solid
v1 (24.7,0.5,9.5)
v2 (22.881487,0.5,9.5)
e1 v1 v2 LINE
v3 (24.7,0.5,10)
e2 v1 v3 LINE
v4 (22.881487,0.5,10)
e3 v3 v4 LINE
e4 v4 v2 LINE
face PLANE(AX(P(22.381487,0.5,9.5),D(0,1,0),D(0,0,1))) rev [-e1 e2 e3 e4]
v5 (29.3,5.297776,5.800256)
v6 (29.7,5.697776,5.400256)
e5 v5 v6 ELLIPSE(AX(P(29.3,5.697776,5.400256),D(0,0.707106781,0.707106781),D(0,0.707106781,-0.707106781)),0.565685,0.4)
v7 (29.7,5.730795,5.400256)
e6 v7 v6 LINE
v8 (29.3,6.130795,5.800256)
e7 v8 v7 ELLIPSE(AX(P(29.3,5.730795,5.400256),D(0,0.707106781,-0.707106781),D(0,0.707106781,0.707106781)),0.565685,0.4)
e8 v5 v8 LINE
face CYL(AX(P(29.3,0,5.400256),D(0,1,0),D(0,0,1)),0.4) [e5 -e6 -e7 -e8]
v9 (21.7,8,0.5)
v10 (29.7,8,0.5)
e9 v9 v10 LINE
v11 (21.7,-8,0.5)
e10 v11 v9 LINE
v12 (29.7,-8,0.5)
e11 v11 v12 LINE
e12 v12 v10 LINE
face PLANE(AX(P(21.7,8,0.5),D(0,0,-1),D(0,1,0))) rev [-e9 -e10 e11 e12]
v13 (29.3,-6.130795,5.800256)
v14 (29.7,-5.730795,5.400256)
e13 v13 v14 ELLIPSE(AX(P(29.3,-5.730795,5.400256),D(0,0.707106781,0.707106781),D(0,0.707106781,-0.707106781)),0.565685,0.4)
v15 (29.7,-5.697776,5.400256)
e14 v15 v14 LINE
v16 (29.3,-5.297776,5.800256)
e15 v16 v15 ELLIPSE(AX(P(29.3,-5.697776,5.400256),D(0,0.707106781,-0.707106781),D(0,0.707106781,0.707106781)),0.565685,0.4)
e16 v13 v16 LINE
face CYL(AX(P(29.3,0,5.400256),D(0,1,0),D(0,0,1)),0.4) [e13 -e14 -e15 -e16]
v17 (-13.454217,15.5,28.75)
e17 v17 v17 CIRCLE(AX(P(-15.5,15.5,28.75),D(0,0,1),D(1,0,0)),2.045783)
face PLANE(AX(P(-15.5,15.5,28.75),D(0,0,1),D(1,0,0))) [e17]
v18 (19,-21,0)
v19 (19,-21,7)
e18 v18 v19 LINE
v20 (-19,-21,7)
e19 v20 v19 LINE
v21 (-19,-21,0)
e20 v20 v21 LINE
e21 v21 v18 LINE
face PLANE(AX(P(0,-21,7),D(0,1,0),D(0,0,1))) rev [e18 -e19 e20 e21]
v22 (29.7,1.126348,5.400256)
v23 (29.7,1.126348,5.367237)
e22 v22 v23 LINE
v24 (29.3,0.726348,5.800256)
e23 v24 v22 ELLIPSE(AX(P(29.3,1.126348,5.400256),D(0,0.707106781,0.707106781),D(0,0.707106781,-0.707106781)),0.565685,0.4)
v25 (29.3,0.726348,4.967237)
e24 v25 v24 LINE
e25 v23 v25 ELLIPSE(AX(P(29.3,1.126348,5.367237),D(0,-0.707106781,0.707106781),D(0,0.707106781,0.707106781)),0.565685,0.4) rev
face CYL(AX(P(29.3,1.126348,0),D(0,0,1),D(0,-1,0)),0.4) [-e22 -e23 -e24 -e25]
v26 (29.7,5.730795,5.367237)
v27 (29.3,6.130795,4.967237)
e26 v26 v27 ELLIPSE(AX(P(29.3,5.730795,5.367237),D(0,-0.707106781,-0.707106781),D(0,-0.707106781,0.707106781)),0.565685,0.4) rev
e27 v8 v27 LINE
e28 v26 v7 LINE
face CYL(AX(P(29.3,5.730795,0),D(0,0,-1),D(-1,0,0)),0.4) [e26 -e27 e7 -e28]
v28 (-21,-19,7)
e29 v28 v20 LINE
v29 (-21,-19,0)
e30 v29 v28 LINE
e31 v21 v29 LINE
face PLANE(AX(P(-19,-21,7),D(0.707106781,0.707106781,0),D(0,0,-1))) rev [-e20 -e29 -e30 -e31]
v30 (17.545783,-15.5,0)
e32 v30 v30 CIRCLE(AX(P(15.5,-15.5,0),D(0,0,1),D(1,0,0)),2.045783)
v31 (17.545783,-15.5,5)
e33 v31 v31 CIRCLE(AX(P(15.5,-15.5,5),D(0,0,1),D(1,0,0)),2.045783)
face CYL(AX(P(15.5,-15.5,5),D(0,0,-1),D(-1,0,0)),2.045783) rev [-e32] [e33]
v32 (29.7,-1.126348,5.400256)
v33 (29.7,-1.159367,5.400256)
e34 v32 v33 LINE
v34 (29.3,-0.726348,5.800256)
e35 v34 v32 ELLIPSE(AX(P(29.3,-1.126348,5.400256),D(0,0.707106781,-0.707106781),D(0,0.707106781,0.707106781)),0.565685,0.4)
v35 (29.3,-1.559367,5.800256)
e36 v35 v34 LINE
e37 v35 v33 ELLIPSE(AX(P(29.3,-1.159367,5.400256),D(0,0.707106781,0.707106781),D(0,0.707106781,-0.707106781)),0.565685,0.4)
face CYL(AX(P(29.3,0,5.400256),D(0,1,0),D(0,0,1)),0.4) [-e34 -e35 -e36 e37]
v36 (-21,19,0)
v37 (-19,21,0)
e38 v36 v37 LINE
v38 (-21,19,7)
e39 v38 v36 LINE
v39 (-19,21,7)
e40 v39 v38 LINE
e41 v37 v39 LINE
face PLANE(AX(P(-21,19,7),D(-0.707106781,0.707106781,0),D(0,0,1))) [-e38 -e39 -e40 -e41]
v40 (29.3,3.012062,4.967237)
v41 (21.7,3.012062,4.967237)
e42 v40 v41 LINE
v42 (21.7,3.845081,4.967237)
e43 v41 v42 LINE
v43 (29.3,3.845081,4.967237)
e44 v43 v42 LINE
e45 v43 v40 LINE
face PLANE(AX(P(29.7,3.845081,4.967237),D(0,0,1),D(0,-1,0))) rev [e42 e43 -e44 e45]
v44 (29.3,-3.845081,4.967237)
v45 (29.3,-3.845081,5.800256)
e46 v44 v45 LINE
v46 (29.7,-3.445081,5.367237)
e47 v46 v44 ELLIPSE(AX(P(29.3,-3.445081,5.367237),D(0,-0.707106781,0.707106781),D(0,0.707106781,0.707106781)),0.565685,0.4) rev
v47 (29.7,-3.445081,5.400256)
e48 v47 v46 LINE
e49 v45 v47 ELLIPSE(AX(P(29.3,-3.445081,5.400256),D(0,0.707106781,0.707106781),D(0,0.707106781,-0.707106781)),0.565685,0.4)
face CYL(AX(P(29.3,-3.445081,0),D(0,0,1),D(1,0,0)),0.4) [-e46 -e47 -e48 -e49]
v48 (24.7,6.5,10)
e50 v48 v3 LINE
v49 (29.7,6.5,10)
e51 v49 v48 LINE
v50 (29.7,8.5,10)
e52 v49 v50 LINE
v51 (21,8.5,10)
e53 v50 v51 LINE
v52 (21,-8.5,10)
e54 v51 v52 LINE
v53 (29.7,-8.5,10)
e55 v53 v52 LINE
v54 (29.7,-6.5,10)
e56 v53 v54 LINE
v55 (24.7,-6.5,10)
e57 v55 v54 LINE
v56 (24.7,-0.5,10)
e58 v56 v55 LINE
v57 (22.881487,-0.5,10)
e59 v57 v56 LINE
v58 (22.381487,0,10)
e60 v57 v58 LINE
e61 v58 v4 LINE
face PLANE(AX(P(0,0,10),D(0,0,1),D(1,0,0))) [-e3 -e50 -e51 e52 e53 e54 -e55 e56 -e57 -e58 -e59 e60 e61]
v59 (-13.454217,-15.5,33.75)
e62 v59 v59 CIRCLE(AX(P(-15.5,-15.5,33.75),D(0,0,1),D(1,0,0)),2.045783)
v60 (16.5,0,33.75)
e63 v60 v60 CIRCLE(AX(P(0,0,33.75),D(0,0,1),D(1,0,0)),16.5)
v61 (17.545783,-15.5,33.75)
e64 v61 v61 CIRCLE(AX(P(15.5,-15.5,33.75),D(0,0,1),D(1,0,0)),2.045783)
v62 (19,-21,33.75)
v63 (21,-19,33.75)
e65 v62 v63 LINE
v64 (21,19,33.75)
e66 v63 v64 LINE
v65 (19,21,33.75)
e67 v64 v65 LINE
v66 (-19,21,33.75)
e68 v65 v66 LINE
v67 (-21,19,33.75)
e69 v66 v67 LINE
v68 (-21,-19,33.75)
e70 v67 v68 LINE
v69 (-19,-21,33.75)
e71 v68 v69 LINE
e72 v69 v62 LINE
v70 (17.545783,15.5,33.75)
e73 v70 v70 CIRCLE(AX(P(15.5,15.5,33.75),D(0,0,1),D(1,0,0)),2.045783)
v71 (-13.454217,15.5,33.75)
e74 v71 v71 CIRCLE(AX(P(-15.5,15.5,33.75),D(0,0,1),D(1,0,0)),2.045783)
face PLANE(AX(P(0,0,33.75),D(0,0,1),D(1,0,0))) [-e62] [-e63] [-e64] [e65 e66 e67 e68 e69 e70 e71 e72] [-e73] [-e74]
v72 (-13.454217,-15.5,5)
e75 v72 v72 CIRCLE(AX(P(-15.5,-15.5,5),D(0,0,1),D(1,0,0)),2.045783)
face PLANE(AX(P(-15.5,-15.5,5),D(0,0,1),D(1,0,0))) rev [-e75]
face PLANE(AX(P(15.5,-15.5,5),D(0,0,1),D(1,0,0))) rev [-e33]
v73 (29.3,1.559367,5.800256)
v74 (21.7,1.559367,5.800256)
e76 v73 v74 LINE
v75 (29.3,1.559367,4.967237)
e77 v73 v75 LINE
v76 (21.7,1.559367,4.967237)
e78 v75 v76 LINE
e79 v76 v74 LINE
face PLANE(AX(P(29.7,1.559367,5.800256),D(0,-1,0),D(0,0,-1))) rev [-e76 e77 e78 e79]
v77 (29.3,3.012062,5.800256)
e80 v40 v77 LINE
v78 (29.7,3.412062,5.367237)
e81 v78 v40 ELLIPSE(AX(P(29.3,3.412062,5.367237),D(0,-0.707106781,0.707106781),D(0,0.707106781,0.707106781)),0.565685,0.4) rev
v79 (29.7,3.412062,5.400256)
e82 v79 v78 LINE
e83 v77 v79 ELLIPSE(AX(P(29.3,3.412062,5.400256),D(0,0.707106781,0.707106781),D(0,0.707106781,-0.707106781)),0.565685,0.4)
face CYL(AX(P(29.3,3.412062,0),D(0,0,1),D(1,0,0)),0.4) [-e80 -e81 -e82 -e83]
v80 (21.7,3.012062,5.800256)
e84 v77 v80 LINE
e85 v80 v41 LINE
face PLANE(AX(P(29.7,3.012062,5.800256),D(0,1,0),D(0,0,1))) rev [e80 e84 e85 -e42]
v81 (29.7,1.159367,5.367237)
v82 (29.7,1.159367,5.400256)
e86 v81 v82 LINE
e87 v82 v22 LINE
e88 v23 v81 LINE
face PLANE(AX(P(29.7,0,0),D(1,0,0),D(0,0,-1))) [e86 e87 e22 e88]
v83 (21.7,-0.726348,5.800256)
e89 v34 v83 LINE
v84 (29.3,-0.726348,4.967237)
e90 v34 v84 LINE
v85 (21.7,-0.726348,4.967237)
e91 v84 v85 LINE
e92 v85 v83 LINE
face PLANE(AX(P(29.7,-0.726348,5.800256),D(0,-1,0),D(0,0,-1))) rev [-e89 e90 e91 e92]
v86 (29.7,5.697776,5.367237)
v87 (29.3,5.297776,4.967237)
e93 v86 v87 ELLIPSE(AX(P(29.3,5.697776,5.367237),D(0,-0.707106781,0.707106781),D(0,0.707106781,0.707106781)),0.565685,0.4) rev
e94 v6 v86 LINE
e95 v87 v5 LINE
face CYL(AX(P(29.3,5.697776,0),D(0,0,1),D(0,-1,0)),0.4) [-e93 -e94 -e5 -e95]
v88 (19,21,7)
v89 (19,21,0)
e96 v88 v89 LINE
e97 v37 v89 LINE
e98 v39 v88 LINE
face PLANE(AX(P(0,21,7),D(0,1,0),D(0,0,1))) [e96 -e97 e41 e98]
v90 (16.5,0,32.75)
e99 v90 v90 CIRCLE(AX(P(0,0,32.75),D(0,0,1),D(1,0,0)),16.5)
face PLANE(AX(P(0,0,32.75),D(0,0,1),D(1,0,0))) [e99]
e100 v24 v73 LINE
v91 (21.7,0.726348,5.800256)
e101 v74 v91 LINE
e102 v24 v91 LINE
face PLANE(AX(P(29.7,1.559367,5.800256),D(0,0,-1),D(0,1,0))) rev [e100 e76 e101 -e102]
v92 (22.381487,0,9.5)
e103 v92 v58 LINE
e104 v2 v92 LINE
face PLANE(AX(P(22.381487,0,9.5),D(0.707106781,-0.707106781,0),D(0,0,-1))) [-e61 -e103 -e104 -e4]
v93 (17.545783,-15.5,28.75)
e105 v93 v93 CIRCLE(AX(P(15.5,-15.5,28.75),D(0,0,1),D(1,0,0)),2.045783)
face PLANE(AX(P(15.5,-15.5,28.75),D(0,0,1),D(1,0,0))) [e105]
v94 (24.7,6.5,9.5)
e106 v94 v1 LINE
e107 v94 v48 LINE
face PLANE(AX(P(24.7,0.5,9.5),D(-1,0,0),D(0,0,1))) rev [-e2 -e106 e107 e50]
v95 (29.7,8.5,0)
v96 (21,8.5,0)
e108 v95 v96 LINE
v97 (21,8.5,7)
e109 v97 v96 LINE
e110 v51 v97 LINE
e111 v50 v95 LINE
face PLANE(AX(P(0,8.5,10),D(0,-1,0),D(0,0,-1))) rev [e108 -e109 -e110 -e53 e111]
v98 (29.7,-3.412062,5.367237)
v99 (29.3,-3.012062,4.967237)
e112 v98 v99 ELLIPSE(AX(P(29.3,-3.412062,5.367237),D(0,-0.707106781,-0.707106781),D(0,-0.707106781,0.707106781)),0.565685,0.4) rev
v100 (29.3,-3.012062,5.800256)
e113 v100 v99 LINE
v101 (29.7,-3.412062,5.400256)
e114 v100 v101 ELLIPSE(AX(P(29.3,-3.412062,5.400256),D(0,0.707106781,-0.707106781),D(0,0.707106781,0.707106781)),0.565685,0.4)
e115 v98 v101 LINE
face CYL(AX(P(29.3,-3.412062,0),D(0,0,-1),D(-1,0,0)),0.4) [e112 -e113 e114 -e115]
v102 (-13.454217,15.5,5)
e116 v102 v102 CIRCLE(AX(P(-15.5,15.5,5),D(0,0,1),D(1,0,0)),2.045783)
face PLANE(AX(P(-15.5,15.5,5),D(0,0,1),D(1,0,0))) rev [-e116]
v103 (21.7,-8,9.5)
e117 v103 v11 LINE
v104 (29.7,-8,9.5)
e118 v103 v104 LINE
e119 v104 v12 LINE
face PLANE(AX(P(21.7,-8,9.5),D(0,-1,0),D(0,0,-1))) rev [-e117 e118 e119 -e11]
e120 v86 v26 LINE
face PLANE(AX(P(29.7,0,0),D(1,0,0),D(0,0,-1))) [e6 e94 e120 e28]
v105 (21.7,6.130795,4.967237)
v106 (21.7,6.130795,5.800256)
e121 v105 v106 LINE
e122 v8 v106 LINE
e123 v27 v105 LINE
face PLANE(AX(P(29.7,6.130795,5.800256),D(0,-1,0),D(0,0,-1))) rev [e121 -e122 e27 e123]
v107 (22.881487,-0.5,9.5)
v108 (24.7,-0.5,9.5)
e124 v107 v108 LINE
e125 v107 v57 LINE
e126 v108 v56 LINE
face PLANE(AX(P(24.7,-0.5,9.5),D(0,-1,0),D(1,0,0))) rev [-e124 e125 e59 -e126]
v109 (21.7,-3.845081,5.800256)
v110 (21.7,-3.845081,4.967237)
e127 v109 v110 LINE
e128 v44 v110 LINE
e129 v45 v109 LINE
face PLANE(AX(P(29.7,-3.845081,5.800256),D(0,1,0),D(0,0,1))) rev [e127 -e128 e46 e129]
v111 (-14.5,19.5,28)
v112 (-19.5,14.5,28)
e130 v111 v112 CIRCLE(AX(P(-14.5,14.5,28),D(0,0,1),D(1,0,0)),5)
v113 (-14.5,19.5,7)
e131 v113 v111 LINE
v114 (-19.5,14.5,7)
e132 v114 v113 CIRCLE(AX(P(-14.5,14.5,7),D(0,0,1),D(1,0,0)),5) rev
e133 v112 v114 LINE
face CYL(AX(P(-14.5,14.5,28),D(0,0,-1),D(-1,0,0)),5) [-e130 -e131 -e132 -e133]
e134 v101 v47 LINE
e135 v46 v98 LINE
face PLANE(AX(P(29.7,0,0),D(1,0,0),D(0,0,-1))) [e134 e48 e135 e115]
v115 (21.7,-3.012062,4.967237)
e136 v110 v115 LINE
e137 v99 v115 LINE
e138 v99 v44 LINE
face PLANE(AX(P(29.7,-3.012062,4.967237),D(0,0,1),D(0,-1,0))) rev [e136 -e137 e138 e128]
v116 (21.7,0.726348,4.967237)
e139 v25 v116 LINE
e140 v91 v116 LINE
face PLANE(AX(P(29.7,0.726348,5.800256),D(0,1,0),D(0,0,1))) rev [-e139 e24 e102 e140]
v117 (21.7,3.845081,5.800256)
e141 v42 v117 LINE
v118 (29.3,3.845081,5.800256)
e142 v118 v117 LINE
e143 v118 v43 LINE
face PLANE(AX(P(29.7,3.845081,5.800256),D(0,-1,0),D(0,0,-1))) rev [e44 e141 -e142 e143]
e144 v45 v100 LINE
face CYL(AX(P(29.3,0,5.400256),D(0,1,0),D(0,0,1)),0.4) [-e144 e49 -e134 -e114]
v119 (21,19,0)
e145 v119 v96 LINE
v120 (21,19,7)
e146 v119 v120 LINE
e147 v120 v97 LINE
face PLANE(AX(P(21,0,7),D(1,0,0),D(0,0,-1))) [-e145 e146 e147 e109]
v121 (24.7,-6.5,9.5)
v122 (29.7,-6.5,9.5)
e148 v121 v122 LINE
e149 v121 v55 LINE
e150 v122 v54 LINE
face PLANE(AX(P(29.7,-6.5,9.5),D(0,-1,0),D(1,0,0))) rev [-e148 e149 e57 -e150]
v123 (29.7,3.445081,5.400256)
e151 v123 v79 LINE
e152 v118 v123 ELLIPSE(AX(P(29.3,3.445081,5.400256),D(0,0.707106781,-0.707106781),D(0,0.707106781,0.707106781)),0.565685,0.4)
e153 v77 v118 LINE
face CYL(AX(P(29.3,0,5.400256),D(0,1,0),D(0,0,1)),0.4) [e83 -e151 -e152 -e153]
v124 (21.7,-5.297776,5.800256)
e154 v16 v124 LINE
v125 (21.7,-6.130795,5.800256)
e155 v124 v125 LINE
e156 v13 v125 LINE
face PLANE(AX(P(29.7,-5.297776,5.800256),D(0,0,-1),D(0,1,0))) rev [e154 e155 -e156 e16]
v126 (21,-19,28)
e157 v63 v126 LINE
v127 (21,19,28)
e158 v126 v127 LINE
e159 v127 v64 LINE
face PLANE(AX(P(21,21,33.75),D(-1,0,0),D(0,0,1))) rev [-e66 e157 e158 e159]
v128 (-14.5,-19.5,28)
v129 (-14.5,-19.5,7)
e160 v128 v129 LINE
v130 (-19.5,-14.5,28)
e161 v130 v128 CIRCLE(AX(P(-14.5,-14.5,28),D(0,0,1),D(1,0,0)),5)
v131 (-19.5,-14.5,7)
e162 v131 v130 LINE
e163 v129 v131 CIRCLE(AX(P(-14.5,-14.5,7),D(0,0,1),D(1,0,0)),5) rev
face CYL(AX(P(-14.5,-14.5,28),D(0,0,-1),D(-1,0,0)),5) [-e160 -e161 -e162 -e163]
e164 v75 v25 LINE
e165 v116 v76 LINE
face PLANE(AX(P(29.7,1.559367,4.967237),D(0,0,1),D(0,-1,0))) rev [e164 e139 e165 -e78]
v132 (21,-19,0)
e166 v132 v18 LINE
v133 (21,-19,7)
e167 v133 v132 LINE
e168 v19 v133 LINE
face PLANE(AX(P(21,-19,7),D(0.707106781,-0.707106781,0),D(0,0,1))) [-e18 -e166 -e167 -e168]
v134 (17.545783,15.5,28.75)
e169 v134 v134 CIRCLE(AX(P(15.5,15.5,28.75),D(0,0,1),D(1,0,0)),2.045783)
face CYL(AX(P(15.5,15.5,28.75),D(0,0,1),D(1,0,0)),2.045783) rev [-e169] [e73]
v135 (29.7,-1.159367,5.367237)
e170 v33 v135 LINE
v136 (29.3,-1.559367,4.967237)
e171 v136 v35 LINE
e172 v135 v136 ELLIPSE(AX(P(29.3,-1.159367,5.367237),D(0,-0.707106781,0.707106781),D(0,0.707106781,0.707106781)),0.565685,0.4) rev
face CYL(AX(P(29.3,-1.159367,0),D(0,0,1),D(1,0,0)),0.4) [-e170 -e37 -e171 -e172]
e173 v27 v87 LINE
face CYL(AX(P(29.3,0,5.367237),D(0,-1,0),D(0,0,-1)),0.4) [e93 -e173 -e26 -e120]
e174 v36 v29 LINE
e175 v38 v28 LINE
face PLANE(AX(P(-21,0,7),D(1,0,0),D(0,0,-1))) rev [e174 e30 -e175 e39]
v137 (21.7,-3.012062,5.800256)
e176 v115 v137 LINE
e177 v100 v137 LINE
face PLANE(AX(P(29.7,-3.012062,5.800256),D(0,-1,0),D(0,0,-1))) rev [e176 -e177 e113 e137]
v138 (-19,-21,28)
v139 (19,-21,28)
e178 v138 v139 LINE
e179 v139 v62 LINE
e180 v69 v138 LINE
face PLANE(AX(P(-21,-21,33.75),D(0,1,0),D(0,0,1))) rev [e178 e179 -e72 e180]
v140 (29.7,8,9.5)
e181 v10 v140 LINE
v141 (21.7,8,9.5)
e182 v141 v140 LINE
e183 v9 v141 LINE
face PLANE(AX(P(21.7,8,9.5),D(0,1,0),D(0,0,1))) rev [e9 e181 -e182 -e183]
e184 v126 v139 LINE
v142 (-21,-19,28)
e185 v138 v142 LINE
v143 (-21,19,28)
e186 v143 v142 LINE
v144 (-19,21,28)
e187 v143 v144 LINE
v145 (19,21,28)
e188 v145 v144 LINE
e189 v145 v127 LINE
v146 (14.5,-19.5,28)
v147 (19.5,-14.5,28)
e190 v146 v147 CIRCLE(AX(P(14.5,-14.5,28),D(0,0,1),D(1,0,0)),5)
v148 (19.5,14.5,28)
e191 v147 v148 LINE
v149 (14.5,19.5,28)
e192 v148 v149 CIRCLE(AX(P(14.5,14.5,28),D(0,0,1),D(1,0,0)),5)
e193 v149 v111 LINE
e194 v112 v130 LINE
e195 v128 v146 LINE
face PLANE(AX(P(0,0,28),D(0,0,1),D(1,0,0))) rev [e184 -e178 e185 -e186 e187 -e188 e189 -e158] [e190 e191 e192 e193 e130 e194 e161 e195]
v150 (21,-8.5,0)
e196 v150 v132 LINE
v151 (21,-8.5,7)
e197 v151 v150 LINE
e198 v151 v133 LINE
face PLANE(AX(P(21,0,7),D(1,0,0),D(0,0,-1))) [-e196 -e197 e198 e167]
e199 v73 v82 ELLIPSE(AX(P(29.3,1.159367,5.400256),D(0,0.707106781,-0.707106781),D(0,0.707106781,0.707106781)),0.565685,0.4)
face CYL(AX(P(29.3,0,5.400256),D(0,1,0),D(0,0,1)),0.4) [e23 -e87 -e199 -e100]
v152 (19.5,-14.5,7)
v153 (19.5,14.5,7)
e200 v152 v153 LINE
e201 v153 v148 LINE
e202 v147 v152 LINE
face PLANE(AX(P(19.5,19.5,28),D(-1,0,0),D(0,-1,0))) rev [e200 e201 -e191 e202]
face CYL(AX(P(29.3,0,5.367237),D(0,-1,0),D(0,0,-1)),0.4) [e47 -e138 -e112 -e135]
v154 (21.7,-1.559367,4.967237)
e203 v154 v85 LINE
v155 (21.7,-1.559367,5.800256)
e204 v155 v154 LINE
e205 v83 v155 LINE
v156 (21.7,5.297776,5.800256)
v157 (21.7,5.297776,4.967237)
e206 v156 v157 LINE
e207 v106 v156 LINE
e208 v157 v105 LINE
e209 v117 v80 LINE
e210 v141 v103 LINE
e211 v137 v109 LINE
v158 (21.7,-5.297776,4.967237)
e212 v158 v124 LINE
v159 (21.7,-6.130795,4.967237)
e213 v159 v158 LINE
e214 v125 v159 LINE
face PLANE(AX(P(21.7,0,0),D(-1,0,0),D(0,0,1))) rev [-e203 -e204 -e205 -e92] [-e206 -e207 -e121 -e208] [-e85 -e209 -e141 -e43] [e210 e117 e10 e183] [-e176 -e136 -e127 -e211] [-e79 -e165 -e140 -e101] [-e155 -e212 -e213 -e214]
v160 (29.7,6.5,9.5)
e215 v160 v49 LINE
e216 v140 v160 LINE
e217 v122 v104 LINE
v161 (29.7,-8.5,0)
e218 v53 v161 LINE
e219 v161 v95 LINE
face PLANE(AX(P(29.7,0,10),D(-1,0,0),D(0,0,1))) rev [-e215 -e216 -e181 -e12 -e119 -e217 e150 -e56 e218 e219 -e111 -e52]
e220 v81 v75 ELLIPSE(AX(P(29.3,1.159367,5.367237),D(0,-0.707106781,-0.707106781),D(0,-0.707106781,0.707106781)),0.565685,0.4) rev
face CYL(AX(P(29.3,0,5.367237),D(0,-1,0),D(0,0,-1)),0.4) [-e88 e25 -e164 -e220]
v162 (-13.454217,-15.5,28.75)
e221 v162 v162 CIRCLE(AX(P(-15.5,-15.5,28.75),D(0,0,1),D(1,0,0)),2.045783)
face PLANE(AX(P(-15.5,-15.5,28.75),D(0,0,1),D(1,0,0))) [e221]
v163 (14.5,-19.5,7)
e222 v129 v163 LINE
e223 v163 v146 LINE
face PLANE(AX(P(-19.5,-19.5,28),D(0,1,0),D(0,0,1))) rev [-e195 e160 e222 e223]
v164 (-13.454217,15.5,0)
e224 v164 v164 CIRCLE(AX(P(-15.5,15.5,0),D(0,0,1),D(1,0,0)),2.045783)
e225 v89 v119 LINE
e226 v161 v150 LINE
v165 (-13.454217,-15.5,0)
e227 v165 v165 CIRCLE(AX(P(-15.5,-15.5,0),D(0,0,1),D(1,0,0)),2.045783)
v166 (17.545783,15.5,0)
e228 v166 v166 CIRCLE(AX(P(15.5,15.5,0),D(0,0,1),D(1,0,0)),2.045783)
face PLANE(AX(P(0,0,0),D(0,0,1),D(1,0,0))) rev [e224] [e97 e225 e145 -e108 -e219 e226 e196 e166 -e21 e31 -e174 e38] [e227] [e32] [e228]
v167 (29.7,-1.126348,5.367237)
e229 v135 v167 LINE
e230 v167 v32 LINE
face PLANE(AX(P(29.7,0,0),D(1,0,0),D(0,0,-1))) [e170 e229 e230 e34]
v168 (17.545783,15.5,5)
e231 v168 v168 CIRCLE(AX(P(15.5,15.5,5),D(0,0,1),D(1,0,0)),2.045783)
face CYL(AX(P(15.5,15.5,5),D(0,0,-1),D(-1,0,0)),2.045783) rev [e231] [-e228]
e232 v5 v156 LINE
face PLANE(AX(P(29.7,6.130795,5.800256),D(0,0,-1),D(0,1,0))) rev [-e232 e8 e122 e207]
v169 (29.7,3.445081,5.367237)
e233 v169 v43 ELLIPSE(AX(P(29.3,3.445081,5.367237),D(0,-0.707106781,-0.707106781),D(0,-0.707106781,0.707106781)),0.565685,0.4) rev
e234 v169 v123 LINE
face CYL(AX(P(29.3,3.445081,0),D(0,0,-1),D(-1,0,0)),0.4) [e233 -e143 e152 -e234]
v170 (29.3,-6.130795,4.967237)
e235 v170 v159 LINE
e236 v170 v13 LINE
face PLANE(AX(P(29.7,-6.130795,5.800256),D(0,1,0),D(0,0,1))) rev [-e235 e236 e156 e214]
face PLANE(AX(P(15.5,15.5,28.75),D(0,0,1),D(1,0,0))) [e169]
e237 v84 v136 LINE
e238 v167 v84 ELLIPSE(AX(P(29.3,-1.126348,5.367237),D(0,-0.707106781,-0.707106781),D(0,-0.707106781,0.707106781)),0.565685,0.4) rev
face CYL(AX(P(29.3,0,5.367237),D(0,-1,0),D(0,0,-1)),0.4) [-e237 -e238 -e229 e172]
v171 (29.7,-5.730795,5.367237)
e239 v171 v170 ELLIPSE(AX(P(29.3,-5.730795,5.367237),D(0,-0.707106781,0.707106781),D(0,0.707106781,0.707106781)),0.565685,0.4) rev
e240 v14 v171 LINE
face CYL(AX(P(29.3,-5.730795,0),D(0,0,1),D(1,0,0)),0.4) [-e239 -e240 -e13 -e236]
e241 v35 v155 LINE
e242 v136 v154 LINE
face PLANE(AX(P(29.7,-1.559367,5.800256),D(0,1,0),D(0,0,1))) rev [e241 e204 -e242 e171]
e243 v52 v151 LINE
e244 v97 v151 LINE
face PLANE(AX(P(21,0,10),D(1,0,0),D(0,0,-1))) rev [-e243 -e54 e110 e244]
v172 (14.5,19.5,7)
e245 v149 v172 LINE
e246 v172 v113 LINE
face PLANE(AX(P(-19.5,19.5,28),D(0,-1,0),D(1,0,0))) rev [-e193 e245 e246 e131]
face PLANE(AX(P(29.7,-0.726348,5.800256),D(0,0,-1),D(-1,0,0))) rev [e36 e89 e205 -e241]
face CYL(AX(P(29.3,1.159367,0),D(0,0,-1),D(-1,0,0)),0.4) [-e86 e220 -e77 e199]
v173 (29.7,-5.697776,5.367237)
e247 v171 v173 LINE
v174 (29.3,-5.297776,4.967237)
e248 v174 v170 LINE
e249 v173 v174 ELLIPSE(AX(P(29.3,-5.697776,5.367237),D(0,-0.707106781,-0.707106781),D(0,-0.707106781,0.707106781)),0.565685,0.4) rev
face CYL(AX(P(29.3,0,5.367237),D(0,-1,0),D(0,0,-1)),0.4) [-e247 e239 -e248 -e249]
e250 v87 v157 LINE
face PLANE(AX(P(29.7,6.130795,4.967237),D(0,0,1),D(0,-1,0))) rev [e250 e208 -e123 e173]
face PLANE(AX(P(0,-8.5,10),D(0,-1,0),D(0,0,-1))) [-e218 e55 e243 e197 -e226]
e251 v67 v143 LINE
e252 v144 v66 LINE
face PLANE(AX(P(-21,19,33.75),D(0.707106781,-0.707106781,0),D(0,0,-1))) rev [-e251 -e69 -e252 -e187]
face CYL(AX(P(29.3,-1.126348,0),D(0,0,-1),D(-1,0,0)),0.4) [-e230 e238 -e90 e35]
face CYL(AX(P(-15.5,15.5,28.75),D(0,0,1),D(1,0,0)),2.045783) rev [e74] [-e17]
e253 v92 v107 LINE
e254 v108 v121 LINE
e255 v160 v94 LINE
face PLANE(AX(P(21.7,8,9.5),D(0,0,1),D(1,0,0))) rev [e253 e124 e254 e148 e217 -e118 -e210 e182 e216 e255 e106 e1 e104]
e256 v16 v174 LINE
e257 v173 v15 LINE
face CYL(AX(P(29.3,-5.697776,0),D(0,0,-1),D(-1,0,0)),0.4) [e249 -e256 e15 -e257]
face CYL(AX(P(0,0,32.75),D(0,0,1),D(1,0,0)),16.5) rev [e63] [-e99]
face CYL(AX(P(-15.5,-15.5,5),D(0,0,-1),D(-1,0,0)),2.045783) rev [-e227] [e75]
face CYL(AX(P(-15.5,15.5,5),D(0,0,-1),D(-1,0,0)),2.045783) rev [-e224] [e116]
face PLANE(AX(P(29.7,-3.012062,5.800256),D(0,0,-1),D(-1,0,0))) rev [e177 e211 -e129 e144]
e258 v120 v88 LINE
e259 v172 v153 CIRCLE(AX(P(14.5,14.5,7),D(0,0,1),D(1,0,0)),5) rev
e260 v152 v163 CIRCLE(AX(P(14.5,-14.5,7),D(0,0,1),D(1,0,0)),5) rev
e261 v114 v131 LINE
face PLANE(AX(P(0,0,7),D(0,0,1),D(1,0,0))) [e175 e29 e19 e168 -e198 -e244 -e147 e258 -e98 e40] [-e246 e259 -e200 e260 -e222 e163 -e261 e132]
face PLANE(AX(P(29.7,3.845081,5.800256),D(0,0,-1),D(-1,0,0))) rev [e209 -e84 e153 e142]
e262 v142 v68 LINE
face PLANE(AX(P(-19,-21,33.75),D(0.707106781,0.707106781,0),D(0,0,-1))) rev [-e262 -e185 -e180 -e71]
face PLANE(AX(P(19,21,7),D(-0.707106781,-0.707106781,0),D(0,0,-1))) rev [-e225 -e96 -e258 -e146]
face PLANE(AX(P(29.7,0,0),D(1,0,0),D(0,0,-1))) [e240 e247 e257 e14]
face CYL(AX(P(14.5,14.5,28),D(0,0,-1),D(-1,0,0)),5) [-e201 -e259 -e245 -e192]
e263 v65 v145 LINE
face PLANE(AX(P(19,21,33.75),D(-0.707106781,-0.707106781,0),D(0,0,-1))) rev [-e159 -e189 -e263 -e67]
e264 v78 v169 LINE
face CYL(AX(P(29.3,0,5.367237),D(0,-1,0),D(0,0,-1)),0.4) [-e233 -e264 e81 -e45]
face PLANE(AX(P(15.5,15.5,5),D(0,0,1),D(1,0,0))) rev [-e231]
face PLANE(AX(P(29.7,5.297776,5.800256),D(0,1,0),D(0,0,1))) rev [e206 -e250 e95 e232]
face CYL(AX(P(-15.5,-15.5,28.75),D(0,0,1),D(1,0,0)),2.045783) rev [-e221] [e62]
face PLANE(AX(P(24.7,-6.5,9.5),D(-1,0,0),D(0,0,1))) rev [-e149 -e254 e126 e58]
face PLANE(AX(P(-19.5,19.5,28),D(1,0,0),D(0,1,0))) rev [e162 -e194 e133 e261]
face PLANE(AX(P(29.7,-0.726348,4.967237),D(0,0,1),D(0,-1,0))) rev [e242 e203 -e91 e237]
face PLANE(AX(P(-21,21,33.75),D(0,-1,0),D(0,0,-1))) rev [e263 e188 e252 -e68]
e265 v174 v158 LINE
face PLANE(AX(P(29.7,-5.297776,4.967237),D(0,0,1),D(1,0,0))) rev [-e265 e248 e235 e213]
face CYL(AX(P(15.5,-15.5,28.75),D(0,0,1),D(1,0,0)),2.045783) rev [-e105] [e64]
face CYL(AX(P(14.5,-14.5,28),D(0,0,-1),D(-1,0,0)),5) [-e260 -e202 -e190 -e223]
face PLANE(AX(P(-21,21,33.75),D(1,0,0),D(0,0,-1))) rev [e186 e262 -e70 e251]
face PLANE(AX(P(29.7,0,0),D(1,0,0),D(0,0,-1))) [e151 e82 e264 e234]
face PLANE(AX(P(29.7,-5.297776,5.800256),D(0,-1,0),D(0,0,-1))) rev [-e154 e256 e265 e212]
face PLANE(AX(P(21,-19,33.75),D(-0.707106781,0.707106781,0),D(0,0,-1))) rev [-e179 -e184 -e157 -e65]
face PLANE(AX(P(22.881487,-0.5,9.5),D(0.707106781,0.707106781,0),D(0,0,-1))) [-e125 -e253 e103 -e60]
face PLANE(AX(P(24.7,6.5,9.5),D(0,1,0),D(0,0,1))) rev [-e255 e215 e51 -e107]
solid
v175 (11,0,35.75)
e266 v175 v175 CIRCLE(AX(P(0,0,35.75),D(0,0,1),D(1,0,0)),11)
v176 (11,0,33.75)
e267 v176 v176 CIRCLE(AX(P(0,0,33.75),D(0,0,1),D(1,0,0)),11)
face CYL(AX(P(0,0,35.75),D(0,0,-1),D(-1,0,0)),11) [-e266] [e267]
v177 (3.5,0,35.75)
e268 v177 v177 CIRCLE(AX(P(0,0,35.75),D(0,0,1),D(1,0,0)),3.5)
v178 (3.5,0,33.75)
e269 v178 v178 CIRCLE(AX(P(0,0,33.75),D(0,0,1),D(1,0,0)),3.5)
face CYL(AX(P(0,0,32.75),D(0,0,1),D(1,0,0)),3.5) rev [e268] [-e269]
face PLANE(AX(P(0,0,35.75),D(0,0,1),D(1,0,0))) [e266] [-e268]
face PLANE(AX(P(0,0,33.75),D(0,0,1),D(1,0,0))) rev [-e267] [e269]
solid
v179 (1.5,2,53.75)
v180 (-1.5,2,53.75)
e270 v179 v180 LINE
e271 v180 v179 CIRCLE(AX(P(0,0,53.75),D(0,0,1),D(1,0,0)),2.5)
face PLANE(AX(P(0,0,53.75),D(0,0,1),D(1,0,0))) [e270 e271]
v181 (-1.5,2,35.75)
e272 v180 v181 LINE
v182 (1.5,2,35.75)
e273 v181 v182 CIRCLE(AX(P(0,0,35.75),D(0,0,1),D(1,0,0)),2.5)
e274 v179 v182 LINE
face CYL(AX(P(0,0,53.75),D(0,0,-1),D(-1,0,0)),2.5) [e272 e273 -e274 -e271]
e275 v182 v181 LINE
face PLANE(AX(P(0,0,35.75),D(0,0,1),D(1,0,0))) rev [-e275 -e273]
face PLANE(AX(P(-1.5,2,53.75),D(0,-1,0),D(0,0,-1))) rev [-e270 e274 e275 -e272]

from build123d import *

# Parameters (mm, degrees)
SALIENTE_EXTRUIR1_DEPTH = 53.75
CROQUIS5_W              = 42
CROQUIS5_H              = 42
SALIENTE_EXTRUIR2_DEPTH = 7
CROQUIS5_3_W            = 8.7
CROQUIS5_3_H            = 17
SALIENTE_EXTRUIR3_DEPTH = 10
CROQUIS6_W              = 39
CROQUIS6_H              = 39
SALIENTE_EXTRUIR4_DEPTH = 21
CROQUIS7_W              = 42
CROQUIS7_H              = 42
SALIENTE_EXTRUIR5_DEPTH = 5.75
CROQUIS8_R              = 11
SALIENTE_EXTRUIR6_DEPTH = 2
CROQUIS9_R              = 16.5
CORTAR_EXTRUIR3_DEPTH   = 1
CROQUIS10_R             = 3.5
CORTAR_EXTRUIR4_DEPTH   = 3
CHAFL_N1_SIZE           = 2
REDONDEO1_R             = 5
CROQUIS11_R             = 2.045783435
CORTAR_EXTRUIR5_DEPTH   = 5
CROQUIS12_R             = 2.045783435
CORTAR_EXTRUIR6_DEPTH   = 5
CROQUIS13_W             = 9
CROQUIS13_H             = 16
CORTAR_EXTRUIR7_DEPTH   = 8
CORTAR_EXTRUIR9_DEPTH   = 0.5
CHAFL_N2_SIZE           = 0.5
CROQUIS16_W             = 0.833018764
CROQUIS16_H             = 0.833018765
CROQUIS16_H_2           = 0.833018764
SALIENTE_EXTRUIR7_DEPTH = 8
REDONDEO19_R            = 0.4


with BuildPart() as part:
    # Croquis3 → Saliente-Extruir1 (new body)
    with BuildSketch(Plane.XY):
        with BuildLine():
            Line((-1.5, 2), (1.5, 2))
            ThreePointArc((1.5, 2), (0, -2.5), (-1.5, 2))
        make_face()
    extrude(amount=SALIENTE_EXTRUIR1_DEPTH)

    # Croquis5 → Saliente-Extruir2 (add)
    with BuildSketch(Plane.XY):
        Rectangle(CROQUIS5_W, CROQUIS5_H)
    extrude(amount=SALIENTE_EXTRUIR2_DEPTH)

    # Croquis5<3> → Saliente-Extruir3 (add)
    with BuildSketch(Plane.XY):
        with Locations((25.35, 0)):
            Rectangle(CROQUIS5_3_W, CROQUIS5_3_H)
    extrude(amount=SALIENTE_EXTRUIR3_DEPTH)

    # Croquis6 → Saliente-Extruir4 (add)
    with BuildSketch(Plane.XY.offset(7)):
        Rectangle(CROQUIS6_W, CROQUIS6_H)
    extrude(amount=SALIENTE_EXTRUIR4_DEPTH)

    # Croquis7 → Saliente-Extruir5 (add)
    with BuildSketch(Plane.XY.offset(28)):
        Rectangle(CROQUIS7_W, CROQUIS7_H)
    extrude(amount=SALIENTE_EXTRUIR5_DEPTH)

    # Croquis8 → Saliente-Extruir6 (add)
    with BuildSketch(Plane.XY.offset(33.75)):
        Circle(CROQUIS8_R)
    extrude(amount=SALIENTE_EXTRUIR6_DEPTH)

    # Croquis9 → Cortar-Extruir3 (cut)
    with BuildSketch(Plane.XY.offset(33.75)):
        Circle(CROQUIS9_R)
    extrude(amount=-CORTAR_EXTRUIR3_DEPTH, mode=Mode.SUBTRACT)


with BuildPart() as cortar_extruir3_piece_1:
    # of the separate pieces the step leaves, piece 1, a body of its own (cortar_extruir3_pieces)
    add(part.part.solids().sort_by_distance((21, 21, 0))[0])

    # Chaflán1
    chafl_n1_edges = [cortar_extruir3_piece_1.edges().sort_by_distance(p)[0] for p in [
        (21, -21, 3.5),
        (21, 21, 3.5),
        (-21, 21, 3.5),
        (-21, -21, 3.5),
        (-21, 21, 30.875),
        (-21, -21, 30.875),
        (21, -21, 30.875),
        (21, 21, 30.875),
    ]]
    chamfer(chafl_n1_edges, length=CHAFL_N1_SIZE)

    # Redondeo1
    redondeo1_edges = [cortar_extruir3_piece_1.edges().sort_by_distance(p)[0] for p in [
        (-19.5, 19.5, 17.5),
        (-19.5, -19.5, 17.5),
        (19.5, -19.5, 17.5),
        (19.5, 19.5, 17.5),
    ]]
    fillet(redondeo1_edges, radius=REDONDEO1_R)

    # Croquis11 → Cortar-Extruir5 (cut)
    with BuildSketch(Plane.XY.offset(33.75)):
        with Locations((-15.5, 15.5)):
            Circle(CROQUIS11_R)
        with Locations((15.5, 15.5)):
            Circle(CROQUIS11_R)
        with Locations((15.5, -15.5)):
            Circle(CROQUIS11_R)
        with Locations((-15.5, -15.5)):
            Circle(CROQUIS11_R)
    extrude(amount=-CORTAR_EXTRUIR5_DEPTH, mode=Mode.SUBTRACT)

    # Croquis12 → Cortar-Extruir6 (cut)
    with BuildSketch(Plane.XY):
        with Locations((-15.5, 15.5)):
            Circle(CROQUIS12_R)
        with Locations((15.5, 15.5)):
            Circle(CROQUIS12_R)
        with Locations((15.5, -15.5)):
            Circle(CROQUIS12_R)
        with Locations((-15.5, -15.5)):
            Circle(CROQUIS12_R)
    extrude(amount=CORTAR_EXTRUIR6_DEPTH, mode=Mode.SUBTRACT)

    # Croquis13 → Cortar-Extruir7 (cut)
    with BuildSketch(Plane(origin=(29.7, 0, 0), x_dir=(0, 0, -1), z_dir=(1, 0, 0))):
        with Locations((-5, 0)):
            Rectangle(CROQUIS13_W, CROQUIS13_H)
    extrude(amount=-CORTAR_EXTRUIR7_DEPTH, mode=Mode.SUBTRACT)

    # Croquis15 → Cortar-Extruir9 (cut)
    with BuildSketch(Plane.XY.offset(10)):
        Polygon((29.7, -6.5), (29.7, 6.5), (24.7, 6.5), (24.7, 0.5), (22.381487387, 0.5), (22.381487387, 0), (22.381487387, -0.5), (24.7, -0.5), (24.7, -6.5), align=None)
    extrude(amount=-CORTAR_EXTRUIR9_DEPTH, mode=Mode.SUBTRACT)

    # Chaflán2
    chafl_n2_edges = [cortar_extruir3_piece_1.edges().sort_by_distance(p)[0] for p in [
        (22.381487387, -0.5, 9.75),
        (22.381487387, 0.5, 9.75),
    ]]
    chamfer(chafl_n2_edges, length=CHAFL_N2_SIZE - 0.0001)  # a hair under: the kernel refuses the full size

    # Croquis16 → Saliente-Extruir7 (add)
    with BuildSketch(Plane(origin=(21.7, 0, 0), x_dir=(0, 0, -1), z_dir=(1, 0, 0))):
        with Locations((-5.383746168, 5.714285715)):
            Rectangle(CROQUIS16_W, CROQUIS16_H)
        with Locations((-5.383746168, -5.714285715)):
            Rectangle(CROQUIS16_W, CROQUIS16_H)
        with Locations((-5.383746168, -3.428571429)):
            Rectangle(CROQUIS16_W, CROQUIS16_H)
        with Locations((-5.383746168, -1.142857143)):
            Rectangle(CROQUIS16_W, CROQUIS16_H_2)
        with Locations((-5.383746168, 1.142857143)):
            Rectangle(CROQUIS16_W, CROQUIS16_H_2)
        with Locations((-5.383746168, 3.428571429)):
            Rectangle(CROQUIS16_W, CROQUIS16_H)
    extrude(amount=SALIENTE_EXTRUIR7_DEPTH)

    # Redondeo19
    redondeo19_edges = [cortar_extruir3_piece_1.edges().sort_by_distance(p)[0] for p in [
        (29.7, 5.714285714, 5.80025555),
        (29.7, 5.297776332, 5.383746168),
        (29.7, 5.714285714, 4.967236786),
        (29.7, 6.130795097, 5.383746168),
        (29.7, -5.714285714, 5.80025555),
        (29.7, -6.130795097, 5.383746168),
        (29.7, -5.714285714, 4.967236786),
        (29.7, -5.297776332, 5.383746168),
        (29.7, -3.428571429, 5.80025555),
        (29.7, -3.845080811, 5.383746168),
        (29.7, -3.428571429, 4.967236786),
        (29.7, -3.012062046, 5.383746168),
        (29.7, -1.142857143, 5.80025555),
        (29.7, -1.559366525, 5.383746168),
        (29.7, -1.142857143, 4.967236786),
        (29.7, -0.726347761, 5.383746168),
        (29.7, 1.142857143, 5.80025555),
        (29.7, 0.726347761, 5.383746168),
        (29.7, 1.142857143, 4.967236786),
        (29.7, 1.559366525, 5.383746168),
        (29.7, 3.428571429, 5.80025555),
        (29.7, 3.012062046, 5.383746168),
        (29.7, 3.428571429, 4.967236786),
        (29.7, 3.845080811, 5.383746168),
    ]]
    fillet(redondeo19_edges, radius=REDONDEO19_R)


with BuildPart() as cortar_extruir3_piece_2:
    # of the separate pieces the step leaves, piece 2, a body of its own (cortar_extruir3_pieces)
    add(part.part.solids().sort_by_distance((11, 0, 33.75))[0])

    # Croquis10 → Cortar-Extruir4 (cut)
    with BuildSketch(Plane.XY.offset(35.75)):
        Circle(CROQUIS10_R)
    extrude(amount=-CORTAR_EXTRUIR4_DEPTH, mode=Mode.SUBTRACT)


with BuildPart() as cortar_extruir4_piece_1:
    # of the separate pieces the step leaves, piece 1, a body of its own (cortar_extruir4_pieces)
    add(cortar_extruir3_piece_2.part.solids().sort_by_distance((11, 0, 33.75))[0])


with BuildPart() as cortar_extruir4_piece_2:
    # of the separate pieces the step leaves, piece 2, a body of its own (cortar_extruir4_pieces)
    add(cortar_extruir3_piece_2.part.solids().sort_by_distance((1.5, 2, 35.75))[0])


solid = Compound([cortar_extruir3_piece_1.part, cortar_extruir4_piece_1.part, cortar_extruir4_piece_2.part])
